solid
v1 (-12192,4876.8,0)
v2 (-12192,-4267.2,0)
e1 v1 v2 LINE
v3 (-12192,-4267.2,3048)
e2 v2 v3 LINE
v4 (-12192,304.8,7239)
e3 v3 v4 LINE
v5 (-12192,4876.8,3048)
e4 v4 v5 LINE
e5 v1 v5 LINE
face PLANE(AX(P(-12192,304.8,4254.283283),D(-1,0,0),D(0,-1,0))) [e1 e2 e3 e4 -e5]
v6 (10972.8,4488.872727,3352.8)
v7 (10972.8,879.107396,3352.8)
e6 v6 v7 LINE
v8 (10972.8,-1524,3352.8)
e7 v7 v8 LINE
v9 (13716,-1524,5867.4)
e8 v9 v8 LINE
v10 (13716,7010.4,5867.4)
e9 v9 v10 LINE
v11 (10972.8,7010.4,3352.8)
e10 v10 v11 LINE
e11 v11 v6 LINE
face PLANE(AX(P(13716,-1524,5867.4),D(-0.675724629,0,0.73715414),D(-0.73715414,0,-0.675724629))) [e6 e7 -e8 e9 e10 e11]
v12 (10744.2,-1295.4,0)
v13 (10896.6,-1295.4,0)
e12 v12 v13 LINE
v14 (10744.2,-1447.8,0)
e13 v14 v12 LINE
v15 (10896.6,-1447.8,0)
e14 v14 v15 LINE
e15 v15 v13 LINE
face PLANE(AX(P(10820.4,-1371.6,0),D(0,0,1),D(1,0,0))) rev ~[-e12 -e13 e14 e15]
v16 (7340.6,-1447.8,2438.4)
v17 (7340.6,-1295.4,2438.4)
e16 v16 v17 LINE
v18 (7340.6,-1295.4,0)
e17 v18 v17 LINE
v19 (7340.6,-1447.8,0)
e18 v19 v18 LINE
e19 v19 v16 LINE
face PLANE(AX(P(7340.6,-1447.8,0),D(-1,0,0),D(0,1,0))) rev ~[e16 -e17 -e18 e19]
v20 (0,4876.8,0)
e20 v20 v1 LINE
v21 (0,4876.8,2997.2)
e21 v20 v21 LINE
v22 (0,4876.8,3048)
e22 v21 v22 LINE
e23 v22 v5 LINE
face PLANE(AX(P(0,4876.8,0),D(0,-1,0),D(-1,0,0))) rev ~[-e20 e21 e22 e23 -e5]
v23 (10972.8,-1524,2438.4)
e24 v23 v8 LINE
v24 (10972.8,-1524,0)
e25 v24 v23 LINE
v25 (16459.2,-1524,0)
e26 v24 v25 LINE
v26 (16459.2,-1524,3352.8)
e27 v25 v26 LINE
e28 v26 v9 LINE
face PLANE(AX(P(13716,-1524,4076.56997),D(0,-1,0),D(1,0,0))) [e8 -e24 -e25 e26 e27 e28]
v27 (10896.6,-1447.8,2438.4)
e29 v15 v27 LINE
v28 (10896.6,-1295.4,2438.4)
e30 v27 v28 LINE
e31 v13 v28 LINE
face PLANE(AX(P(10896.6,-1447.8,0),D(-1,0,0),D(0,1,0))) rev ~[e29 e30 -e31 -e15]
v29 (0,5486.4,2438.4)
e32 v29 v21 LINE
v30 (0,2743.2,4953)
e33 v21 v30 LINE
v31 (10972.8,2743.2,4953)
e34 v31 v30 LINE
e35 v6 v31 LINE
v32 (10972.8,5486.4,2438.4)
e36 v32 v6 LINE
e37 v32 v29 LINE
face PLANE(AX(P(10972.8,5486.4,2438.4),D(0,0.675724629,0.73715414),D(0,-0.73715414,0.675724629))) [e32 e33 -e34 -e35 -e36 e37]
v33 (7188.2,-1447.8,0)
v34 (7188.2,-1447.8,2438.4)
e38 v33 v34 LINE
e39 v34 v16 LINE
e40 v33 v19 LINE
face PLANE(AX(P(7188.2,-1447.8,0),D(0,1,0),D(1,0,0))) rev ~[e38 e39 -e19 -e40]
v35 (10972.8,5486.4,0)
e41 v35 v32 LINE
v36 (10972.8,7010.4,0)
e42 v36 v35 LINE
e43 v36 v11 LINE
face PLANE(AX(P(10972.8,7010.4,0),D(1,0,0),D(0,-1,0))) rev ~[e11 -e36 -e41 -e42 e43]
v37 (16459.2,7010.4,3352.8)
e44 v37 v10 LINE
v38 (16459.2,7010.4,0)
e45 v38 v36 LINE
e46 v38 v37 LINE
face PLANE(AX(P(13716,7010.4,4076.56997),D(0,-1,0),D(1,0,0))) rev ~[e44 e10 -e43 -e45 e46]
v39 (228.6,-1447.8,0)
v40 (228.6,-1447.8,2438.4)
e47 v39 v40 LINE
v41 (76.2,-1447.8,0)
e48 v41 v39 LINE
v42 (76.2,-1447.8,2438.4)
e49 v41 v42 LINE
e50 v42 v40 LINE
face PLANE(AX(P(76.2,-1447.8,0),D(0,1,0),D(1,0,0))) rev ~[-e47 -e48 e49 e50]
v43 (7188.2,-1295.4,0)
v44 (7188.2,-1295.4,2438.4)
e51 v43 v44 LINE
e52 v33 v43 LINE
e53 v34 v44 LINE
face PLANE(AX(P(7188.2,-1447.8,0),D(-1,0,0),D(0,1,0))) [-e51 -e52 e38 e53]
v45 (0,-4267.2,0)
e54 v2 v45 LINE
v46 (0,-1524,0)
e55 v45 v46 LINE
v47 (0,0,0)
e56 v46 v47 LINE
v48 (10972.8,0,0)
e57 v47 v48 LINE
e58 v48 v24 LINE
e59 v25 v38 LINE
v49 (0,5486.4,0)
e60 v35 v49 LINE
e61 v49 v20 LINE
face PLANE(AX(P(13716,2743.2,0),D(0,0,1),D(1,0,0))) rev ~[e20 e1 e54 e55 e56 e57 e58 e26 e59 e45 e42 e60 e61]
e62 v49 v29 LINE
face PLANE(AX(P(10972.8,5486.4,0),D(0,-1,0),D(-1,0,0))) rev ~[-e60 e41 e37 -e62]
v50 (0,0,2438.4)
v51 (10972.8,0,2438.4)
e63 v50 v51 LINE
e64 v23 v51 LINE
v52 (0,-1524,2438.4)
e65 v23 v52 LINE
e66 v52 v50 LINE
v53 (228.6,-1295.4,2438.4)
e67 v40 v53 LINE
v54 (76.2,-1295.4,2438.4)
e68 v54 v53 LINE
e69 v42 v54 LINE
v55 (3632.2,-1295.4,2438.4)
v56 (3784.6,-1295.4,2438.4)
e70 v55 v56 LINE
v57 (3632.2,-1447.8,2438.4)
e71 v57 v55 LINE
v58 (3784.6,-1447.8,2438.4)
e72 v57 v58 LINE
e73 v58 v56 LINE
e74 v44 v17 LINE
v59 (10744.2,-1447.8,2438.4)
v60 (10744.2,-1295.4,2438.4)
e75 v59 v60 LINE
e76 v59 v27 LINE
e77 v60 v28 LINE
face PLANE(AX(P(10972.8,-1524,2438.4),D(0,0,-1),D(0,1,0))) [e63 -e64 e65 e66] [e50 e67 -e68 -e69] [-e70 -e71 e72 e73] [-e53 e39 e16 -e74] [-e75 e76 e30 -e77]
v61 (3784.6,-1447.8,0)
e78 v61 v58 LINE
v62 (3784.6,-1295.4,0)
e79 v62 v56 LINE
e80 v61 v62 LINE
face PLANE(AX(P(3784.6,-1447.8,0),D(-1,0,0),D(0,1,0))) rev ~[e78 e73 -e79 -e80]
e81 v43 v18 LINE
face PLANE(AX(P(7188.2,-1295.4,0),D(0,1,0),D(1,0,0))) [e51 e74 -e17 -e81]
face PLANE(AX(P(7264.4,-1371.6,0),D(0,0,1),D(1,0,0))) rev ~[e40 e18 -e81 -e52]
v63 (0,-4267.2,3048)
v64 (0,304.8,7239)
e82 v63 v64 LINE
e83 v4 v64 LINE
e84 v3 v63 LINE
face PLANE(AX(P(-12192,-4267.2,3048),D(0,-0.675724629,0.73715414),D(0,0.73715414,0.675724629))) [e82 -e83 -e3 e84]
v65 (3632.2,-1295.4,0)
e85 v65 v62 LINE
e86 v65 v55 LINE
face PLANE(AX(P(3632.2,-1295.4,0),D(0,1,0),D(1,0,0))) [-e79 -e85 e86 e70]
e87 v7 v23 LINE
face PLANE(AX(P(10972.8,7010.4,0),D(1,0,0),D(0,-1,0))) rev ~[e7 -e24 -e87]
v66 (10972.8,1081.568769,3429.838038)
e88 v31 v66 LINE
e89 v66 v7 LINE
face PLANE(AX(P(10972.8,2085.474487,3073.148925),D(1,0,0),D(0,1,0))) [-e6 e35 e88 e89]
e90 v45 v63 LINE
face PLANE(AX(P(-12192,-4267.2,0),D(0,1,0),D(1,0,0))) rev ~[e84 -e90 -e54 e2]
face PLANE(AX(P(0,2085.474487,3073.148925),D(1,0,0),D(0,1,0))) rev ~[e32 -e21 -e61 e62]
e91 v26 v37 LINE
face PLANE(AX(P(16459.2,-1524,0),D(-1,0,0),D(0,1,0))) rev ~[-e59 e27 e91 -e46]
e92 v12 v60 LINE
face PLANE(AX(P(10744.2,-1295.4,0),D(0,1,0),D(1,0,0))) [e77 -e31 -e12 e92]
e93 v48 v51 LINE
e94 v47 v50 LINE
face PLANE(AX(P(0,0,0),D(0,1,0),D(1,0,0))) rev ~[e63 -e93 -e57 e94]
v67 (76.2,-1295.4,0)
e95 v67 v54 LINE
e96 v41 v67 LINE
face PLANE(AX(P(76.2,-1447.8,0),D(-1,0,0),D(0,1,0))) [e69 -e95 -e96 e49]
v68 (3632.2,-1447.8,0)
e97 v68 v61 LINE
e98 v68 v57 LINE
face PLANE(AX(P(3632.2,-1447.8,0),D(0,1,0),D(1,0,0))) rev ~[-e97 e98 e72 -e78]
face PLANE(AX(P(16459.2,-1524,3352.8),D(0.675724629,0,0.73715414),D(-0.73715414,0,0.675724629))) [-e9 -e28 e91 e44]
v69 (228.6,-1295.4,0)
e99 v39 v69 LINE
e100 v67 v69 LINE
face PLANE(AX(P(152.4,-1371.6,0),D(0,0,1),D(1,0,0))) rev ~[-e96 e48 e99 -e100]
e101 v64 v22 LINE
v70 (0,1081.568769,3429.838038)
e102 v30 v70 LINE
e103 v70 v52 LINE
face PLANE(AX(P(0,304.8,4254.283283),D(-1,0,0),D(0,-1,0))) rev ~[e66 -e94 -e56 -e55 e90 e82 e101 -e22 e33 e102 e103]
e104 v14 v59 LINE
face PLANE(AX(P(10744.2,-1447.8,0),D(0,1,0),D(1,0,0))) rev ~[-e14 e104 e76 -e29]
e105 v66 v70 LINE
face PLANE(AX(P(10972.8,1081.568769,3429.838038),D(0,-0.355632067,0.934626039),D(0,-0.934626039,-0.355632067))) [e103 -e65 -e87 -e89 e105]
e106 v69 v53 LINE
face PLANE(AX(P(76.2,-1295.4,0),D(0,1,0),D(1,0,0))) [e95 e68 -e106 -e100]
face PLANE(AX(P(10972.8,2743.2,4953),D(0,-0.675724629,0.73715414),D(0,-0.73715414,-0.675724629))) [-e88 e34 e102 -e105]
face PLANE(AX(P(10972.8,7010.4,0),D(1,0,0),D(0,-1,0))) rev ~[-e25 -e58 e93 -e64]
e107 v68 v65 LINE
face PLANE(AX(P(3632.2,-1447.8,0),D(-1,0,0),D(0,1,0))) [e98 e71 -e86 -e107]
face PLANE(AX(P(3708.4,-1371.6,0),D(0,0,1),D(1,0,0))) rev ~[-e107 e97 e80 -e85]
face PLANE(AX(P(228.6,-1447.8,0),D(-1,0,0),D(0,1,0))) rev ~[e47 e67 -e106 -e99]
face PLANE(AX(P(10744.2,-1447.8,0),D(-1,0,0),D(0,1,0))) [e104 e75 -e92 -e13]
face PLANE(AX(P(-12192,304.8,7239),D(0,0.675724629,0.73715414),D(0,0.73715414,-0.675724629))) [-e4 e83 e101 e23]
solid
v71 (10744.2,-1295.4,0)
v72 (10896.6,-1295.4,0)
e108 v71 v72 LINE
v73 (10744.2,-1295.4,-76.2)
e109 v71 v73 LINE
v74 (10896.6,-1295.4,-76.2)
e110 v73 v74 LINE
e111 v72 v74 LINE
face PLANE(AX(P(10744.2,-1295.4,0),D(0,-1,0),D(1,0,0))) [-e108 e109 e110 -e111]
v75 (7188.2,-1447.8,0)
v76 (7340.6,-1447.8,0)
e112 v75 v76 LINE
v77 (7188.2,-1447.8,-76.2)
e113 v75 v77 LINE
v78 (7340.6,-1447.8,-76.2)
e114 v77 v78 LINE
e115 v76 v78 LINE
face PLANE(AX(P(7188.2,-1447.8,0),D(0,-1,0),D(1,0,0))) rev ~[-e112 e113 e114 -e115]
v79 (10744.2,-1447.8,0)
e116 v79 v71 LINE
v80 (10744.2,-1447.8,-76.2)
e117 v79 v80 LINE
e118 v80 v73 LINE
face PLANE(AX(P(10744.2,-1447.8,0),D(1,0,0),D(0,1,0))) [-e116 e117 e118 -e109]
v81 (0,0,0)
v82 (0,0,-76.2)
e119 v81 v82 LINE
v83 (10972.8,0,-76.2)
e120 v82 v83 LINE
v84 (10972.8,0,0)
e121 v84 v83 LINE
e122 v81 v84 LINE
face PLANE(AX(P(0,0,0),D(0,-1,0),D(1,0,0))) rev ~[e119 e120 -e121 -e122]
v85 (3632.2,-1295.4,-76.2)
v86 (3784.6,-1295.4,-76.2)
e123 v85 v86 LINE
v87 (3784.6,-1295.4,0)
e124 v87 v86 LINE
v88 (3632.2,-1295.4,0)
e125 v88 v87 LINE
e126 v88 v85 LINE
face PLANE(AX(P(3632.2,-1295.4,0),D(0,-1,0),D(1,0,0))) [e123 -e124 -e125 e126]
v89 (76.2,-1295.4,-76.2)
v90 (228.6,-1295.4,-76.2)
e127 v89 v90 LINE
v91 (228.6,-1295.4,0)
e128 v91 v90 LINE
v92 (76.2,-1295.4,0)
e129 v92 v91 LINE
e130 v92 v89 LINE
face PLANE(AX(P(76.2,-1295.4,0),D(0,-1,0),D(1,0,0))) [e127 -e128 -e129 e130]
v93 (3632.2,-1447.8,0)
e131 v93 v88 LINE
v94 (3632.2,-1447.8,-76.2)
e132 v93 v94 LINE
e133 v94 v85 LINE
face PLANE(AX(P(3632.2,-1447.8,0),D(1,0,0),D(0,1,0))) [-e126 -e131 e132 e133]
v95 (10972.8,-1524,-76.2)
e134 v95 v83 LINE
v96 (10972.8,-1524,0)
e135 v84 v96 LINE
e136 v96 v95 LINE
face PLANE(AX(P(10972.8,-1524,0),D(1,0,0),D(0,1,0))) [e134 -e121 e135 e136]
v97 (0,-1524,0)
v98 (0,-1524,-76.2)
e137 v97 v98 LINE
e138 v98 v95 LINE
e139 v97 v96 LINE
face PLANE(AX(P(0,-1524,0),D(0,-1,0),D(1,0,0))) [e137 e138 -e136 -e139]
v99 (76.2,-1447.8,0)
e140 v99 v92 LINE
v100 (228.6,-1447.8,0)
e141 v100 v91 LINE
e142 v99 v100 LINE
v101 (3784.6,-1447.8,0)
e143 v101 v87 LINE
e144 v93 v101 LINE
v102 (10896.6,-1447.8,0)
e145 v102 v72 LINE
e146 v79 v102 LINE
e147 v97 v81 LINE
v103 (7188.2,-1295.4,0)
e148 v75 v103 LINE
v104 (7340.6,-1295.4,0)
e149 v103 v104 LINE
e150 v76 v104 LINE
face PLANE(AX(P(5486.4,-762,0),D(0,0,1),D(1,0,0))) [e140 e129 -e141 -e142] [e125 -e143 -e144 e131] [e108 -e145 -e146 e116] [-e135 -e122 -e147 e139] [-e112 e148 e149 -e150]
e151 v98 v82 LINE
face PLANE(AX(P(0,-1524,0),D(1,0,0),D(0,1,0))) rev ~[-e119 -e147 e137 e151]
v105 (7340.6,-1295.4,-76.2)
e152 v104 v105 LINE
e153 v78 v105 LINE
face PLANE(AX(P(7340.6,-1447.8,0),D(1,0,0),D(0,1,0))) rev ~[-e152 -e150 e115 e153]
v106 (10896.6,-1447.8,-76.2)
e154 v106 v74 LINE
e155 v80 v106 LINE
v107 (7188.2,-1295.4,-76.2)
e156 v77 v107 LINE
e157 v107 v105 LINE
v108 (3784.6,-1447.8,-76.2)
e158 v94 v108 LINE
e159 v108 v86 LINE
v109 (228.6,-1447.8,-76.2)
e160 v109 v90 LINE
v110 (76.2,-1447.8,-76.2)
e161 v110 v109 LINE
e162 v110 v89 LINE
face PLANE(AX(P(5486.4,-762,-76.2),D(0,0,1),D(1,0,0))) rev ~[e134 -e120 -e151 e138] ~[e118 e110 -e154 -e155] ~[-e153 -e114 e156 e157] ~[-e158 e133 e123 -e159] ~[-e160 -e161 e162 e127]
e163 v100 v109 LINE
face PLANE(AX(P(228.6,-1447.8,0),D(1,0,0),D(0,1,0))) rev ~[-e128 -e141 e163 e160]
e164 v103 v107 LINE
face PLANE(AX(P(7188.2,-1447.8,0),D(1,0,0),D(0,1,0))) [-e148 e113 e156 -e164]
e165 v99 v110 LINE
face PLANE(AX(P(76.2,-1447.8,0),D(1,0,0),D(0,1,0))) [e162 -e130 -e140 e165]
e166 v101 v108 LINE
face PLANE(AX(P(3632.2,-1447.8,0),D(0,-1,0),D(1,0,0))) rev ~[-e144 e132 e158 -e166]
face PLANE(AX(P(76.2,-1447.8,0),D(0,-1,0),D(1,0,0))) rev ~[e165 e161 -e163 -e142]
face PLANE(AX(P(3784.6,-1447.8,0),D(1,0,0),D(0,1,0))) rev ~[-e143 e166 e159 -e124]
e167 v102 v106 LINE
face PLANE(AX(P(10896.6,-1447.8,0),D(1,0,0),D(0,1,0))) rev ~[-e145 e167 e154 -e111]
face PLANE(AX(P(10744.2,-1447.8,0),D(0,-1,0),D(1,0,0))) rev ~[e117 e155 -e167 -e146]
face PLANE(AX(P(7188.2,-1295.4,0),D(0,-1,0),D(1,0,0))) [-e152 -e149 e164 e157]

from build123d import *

# Parameters (mm, degrees)
F1_DEPTH  = 3048
F3_DEPTH  = 12192
F4_DEPTH  = 2438.4
F6_DEPTH  = 10972.8
F7_DEPTH  = 3352.8
F0_W      = 10972.8
F0_H      = 1524
F0_W_2    = 152.4
F0_H_2    = 152.4
F8_DEPTH  = 76.2
F9_DEPTH  = 2438.4
F11_DEPTH = 8534.4
F12_DEPTH = 2438.4
F13_DEPTH = 2438.4
F14_DEPTH = 2438.4


with BuildPart() as f1:
    # F0 (on Top) → F1 (new body)
    with BuildSketch(Plane.XY):
        Polygon((0, -1524), (0, 0), (0, 4876.8), (-12192, 4876.8), (-12192, -4267.2), (0, -4267.2), align=None)
    extrude(amount=F1_DEPTH)

    # F2 (on face) → F3 (join, through all)
    with BuildSketch(Plane(origin=(-12192, 0, 0), x_dir=(0, -1, 0), z_dir=(-1, 0, 0))):
        Polygon((4267.2, 3048), (-304.8, 7239), (-4876.8, 3048), align=None)
    extrude(amount=-F3_DEPTH)

    # F0 (on Top) → F4 (join)
    with BuildSketch(Plane.XY):
        Polygon((0, 4876.8), (0, 0), (10972.8, 0), (10972.8, 5486.4), (0, 5486.4), align=None)
    extrude(amount=F4_DEPTH)

    # F5 (on face) → F6 (join, through all)
    with BuildSketch(Plane.YZ.offset(10972.8)):
        Polygon((2743.2, 4953), (1081.5687689554, 3429.8380382092), (-1524, 2438.4), (0, 2438.4), (5486.4, 2438.4), align=None)
    extrude(amount=-F6_DEPTH)

    # F0 (on Top) → F7 (join)
    with BuildSketch(Plane.XY):
        Polygon((10972.8, 5486.4), (10972.8, 0), (10972.8, -1524), (16459.2, -1524), (16459.2, 7010.4), (10972.8, 7010.4), align=None)
    extrude(amount=F7_DEPTH)



with BuildPart() as f8:
    # F0 (on Top) → F8 (new body)
    with BuildSketch(Plane.XY):
        with Locations((5486.4, -762)):
            Rectangle(F0_W, F0_H)
        with Locations((152.4, -1371.6)):
            Rectangle(F0_W_2, F0_H_2, mode=Mode.SUBTRACT)
        with Locations((3708.4, -1371.6)):
            Rectangle(F0_W_2, F0_H_2, mode=Mode.SUBTRACT)
        with Locations((7264.4, -1371.6)):
            Rectangle(F0_W_2, F0_H_2, mode=Mode.SUBTRACT)
        with Locations((10820.4, -1371.6)):
            Rectangle(F0_W_2, F0_H_2, mode=Mode.SUBTRACT)
    extrude(amount=-F8_DEPTH)


with BuildPart() as f1_1:
    add(f1.part)

    add(f8.part)  # F9 merges F8
    # F0 (on Top) → F9 (join, through all)
    with BuildSketch(Plane.XY):
        with Locations((152.4, -1371.6)):
            Rectangle(F0_W_2, F0_H_2)
    extrude(amount=F9_DEPTH)

    # F10 (on face) → F11 (join, through all)
    with BuildSketch(Plane.XZ.offset(1524)):
        Polygon((13716, 5867.4), (10972.8, 3352.8), (16459.2, 3352.8), align=None)
    extrude(amount=-F11_DEPTH)

    # F0 (on Top) → F12 (join, through all)
    with BuildSketch(Plane.XY):
        with Locations((10820.4, -1371.6)):
            Rectangle(F0_W_2, F0_H_2)
    extrude(amount=F12_DEPTH)

    # F0 (on Top) → F13 (join, through all)
    with BuildSketch(Plane.XY):
        with Locations((7264.4, -1371.6)):
            Rectangle(F0_W_2, F0_H_2)
    extrude(amount=F13_DEPTH)

    # F0 (on Top) → F14 (join, through all)
    with BuildSketch(Plane.XY):
        with Locations((3708.4, -1371.6)):
            Rectangle(F0_W_2, F0_H_2)
    extrude(amount=F14_DEPTH)


solid = f1_1.part
